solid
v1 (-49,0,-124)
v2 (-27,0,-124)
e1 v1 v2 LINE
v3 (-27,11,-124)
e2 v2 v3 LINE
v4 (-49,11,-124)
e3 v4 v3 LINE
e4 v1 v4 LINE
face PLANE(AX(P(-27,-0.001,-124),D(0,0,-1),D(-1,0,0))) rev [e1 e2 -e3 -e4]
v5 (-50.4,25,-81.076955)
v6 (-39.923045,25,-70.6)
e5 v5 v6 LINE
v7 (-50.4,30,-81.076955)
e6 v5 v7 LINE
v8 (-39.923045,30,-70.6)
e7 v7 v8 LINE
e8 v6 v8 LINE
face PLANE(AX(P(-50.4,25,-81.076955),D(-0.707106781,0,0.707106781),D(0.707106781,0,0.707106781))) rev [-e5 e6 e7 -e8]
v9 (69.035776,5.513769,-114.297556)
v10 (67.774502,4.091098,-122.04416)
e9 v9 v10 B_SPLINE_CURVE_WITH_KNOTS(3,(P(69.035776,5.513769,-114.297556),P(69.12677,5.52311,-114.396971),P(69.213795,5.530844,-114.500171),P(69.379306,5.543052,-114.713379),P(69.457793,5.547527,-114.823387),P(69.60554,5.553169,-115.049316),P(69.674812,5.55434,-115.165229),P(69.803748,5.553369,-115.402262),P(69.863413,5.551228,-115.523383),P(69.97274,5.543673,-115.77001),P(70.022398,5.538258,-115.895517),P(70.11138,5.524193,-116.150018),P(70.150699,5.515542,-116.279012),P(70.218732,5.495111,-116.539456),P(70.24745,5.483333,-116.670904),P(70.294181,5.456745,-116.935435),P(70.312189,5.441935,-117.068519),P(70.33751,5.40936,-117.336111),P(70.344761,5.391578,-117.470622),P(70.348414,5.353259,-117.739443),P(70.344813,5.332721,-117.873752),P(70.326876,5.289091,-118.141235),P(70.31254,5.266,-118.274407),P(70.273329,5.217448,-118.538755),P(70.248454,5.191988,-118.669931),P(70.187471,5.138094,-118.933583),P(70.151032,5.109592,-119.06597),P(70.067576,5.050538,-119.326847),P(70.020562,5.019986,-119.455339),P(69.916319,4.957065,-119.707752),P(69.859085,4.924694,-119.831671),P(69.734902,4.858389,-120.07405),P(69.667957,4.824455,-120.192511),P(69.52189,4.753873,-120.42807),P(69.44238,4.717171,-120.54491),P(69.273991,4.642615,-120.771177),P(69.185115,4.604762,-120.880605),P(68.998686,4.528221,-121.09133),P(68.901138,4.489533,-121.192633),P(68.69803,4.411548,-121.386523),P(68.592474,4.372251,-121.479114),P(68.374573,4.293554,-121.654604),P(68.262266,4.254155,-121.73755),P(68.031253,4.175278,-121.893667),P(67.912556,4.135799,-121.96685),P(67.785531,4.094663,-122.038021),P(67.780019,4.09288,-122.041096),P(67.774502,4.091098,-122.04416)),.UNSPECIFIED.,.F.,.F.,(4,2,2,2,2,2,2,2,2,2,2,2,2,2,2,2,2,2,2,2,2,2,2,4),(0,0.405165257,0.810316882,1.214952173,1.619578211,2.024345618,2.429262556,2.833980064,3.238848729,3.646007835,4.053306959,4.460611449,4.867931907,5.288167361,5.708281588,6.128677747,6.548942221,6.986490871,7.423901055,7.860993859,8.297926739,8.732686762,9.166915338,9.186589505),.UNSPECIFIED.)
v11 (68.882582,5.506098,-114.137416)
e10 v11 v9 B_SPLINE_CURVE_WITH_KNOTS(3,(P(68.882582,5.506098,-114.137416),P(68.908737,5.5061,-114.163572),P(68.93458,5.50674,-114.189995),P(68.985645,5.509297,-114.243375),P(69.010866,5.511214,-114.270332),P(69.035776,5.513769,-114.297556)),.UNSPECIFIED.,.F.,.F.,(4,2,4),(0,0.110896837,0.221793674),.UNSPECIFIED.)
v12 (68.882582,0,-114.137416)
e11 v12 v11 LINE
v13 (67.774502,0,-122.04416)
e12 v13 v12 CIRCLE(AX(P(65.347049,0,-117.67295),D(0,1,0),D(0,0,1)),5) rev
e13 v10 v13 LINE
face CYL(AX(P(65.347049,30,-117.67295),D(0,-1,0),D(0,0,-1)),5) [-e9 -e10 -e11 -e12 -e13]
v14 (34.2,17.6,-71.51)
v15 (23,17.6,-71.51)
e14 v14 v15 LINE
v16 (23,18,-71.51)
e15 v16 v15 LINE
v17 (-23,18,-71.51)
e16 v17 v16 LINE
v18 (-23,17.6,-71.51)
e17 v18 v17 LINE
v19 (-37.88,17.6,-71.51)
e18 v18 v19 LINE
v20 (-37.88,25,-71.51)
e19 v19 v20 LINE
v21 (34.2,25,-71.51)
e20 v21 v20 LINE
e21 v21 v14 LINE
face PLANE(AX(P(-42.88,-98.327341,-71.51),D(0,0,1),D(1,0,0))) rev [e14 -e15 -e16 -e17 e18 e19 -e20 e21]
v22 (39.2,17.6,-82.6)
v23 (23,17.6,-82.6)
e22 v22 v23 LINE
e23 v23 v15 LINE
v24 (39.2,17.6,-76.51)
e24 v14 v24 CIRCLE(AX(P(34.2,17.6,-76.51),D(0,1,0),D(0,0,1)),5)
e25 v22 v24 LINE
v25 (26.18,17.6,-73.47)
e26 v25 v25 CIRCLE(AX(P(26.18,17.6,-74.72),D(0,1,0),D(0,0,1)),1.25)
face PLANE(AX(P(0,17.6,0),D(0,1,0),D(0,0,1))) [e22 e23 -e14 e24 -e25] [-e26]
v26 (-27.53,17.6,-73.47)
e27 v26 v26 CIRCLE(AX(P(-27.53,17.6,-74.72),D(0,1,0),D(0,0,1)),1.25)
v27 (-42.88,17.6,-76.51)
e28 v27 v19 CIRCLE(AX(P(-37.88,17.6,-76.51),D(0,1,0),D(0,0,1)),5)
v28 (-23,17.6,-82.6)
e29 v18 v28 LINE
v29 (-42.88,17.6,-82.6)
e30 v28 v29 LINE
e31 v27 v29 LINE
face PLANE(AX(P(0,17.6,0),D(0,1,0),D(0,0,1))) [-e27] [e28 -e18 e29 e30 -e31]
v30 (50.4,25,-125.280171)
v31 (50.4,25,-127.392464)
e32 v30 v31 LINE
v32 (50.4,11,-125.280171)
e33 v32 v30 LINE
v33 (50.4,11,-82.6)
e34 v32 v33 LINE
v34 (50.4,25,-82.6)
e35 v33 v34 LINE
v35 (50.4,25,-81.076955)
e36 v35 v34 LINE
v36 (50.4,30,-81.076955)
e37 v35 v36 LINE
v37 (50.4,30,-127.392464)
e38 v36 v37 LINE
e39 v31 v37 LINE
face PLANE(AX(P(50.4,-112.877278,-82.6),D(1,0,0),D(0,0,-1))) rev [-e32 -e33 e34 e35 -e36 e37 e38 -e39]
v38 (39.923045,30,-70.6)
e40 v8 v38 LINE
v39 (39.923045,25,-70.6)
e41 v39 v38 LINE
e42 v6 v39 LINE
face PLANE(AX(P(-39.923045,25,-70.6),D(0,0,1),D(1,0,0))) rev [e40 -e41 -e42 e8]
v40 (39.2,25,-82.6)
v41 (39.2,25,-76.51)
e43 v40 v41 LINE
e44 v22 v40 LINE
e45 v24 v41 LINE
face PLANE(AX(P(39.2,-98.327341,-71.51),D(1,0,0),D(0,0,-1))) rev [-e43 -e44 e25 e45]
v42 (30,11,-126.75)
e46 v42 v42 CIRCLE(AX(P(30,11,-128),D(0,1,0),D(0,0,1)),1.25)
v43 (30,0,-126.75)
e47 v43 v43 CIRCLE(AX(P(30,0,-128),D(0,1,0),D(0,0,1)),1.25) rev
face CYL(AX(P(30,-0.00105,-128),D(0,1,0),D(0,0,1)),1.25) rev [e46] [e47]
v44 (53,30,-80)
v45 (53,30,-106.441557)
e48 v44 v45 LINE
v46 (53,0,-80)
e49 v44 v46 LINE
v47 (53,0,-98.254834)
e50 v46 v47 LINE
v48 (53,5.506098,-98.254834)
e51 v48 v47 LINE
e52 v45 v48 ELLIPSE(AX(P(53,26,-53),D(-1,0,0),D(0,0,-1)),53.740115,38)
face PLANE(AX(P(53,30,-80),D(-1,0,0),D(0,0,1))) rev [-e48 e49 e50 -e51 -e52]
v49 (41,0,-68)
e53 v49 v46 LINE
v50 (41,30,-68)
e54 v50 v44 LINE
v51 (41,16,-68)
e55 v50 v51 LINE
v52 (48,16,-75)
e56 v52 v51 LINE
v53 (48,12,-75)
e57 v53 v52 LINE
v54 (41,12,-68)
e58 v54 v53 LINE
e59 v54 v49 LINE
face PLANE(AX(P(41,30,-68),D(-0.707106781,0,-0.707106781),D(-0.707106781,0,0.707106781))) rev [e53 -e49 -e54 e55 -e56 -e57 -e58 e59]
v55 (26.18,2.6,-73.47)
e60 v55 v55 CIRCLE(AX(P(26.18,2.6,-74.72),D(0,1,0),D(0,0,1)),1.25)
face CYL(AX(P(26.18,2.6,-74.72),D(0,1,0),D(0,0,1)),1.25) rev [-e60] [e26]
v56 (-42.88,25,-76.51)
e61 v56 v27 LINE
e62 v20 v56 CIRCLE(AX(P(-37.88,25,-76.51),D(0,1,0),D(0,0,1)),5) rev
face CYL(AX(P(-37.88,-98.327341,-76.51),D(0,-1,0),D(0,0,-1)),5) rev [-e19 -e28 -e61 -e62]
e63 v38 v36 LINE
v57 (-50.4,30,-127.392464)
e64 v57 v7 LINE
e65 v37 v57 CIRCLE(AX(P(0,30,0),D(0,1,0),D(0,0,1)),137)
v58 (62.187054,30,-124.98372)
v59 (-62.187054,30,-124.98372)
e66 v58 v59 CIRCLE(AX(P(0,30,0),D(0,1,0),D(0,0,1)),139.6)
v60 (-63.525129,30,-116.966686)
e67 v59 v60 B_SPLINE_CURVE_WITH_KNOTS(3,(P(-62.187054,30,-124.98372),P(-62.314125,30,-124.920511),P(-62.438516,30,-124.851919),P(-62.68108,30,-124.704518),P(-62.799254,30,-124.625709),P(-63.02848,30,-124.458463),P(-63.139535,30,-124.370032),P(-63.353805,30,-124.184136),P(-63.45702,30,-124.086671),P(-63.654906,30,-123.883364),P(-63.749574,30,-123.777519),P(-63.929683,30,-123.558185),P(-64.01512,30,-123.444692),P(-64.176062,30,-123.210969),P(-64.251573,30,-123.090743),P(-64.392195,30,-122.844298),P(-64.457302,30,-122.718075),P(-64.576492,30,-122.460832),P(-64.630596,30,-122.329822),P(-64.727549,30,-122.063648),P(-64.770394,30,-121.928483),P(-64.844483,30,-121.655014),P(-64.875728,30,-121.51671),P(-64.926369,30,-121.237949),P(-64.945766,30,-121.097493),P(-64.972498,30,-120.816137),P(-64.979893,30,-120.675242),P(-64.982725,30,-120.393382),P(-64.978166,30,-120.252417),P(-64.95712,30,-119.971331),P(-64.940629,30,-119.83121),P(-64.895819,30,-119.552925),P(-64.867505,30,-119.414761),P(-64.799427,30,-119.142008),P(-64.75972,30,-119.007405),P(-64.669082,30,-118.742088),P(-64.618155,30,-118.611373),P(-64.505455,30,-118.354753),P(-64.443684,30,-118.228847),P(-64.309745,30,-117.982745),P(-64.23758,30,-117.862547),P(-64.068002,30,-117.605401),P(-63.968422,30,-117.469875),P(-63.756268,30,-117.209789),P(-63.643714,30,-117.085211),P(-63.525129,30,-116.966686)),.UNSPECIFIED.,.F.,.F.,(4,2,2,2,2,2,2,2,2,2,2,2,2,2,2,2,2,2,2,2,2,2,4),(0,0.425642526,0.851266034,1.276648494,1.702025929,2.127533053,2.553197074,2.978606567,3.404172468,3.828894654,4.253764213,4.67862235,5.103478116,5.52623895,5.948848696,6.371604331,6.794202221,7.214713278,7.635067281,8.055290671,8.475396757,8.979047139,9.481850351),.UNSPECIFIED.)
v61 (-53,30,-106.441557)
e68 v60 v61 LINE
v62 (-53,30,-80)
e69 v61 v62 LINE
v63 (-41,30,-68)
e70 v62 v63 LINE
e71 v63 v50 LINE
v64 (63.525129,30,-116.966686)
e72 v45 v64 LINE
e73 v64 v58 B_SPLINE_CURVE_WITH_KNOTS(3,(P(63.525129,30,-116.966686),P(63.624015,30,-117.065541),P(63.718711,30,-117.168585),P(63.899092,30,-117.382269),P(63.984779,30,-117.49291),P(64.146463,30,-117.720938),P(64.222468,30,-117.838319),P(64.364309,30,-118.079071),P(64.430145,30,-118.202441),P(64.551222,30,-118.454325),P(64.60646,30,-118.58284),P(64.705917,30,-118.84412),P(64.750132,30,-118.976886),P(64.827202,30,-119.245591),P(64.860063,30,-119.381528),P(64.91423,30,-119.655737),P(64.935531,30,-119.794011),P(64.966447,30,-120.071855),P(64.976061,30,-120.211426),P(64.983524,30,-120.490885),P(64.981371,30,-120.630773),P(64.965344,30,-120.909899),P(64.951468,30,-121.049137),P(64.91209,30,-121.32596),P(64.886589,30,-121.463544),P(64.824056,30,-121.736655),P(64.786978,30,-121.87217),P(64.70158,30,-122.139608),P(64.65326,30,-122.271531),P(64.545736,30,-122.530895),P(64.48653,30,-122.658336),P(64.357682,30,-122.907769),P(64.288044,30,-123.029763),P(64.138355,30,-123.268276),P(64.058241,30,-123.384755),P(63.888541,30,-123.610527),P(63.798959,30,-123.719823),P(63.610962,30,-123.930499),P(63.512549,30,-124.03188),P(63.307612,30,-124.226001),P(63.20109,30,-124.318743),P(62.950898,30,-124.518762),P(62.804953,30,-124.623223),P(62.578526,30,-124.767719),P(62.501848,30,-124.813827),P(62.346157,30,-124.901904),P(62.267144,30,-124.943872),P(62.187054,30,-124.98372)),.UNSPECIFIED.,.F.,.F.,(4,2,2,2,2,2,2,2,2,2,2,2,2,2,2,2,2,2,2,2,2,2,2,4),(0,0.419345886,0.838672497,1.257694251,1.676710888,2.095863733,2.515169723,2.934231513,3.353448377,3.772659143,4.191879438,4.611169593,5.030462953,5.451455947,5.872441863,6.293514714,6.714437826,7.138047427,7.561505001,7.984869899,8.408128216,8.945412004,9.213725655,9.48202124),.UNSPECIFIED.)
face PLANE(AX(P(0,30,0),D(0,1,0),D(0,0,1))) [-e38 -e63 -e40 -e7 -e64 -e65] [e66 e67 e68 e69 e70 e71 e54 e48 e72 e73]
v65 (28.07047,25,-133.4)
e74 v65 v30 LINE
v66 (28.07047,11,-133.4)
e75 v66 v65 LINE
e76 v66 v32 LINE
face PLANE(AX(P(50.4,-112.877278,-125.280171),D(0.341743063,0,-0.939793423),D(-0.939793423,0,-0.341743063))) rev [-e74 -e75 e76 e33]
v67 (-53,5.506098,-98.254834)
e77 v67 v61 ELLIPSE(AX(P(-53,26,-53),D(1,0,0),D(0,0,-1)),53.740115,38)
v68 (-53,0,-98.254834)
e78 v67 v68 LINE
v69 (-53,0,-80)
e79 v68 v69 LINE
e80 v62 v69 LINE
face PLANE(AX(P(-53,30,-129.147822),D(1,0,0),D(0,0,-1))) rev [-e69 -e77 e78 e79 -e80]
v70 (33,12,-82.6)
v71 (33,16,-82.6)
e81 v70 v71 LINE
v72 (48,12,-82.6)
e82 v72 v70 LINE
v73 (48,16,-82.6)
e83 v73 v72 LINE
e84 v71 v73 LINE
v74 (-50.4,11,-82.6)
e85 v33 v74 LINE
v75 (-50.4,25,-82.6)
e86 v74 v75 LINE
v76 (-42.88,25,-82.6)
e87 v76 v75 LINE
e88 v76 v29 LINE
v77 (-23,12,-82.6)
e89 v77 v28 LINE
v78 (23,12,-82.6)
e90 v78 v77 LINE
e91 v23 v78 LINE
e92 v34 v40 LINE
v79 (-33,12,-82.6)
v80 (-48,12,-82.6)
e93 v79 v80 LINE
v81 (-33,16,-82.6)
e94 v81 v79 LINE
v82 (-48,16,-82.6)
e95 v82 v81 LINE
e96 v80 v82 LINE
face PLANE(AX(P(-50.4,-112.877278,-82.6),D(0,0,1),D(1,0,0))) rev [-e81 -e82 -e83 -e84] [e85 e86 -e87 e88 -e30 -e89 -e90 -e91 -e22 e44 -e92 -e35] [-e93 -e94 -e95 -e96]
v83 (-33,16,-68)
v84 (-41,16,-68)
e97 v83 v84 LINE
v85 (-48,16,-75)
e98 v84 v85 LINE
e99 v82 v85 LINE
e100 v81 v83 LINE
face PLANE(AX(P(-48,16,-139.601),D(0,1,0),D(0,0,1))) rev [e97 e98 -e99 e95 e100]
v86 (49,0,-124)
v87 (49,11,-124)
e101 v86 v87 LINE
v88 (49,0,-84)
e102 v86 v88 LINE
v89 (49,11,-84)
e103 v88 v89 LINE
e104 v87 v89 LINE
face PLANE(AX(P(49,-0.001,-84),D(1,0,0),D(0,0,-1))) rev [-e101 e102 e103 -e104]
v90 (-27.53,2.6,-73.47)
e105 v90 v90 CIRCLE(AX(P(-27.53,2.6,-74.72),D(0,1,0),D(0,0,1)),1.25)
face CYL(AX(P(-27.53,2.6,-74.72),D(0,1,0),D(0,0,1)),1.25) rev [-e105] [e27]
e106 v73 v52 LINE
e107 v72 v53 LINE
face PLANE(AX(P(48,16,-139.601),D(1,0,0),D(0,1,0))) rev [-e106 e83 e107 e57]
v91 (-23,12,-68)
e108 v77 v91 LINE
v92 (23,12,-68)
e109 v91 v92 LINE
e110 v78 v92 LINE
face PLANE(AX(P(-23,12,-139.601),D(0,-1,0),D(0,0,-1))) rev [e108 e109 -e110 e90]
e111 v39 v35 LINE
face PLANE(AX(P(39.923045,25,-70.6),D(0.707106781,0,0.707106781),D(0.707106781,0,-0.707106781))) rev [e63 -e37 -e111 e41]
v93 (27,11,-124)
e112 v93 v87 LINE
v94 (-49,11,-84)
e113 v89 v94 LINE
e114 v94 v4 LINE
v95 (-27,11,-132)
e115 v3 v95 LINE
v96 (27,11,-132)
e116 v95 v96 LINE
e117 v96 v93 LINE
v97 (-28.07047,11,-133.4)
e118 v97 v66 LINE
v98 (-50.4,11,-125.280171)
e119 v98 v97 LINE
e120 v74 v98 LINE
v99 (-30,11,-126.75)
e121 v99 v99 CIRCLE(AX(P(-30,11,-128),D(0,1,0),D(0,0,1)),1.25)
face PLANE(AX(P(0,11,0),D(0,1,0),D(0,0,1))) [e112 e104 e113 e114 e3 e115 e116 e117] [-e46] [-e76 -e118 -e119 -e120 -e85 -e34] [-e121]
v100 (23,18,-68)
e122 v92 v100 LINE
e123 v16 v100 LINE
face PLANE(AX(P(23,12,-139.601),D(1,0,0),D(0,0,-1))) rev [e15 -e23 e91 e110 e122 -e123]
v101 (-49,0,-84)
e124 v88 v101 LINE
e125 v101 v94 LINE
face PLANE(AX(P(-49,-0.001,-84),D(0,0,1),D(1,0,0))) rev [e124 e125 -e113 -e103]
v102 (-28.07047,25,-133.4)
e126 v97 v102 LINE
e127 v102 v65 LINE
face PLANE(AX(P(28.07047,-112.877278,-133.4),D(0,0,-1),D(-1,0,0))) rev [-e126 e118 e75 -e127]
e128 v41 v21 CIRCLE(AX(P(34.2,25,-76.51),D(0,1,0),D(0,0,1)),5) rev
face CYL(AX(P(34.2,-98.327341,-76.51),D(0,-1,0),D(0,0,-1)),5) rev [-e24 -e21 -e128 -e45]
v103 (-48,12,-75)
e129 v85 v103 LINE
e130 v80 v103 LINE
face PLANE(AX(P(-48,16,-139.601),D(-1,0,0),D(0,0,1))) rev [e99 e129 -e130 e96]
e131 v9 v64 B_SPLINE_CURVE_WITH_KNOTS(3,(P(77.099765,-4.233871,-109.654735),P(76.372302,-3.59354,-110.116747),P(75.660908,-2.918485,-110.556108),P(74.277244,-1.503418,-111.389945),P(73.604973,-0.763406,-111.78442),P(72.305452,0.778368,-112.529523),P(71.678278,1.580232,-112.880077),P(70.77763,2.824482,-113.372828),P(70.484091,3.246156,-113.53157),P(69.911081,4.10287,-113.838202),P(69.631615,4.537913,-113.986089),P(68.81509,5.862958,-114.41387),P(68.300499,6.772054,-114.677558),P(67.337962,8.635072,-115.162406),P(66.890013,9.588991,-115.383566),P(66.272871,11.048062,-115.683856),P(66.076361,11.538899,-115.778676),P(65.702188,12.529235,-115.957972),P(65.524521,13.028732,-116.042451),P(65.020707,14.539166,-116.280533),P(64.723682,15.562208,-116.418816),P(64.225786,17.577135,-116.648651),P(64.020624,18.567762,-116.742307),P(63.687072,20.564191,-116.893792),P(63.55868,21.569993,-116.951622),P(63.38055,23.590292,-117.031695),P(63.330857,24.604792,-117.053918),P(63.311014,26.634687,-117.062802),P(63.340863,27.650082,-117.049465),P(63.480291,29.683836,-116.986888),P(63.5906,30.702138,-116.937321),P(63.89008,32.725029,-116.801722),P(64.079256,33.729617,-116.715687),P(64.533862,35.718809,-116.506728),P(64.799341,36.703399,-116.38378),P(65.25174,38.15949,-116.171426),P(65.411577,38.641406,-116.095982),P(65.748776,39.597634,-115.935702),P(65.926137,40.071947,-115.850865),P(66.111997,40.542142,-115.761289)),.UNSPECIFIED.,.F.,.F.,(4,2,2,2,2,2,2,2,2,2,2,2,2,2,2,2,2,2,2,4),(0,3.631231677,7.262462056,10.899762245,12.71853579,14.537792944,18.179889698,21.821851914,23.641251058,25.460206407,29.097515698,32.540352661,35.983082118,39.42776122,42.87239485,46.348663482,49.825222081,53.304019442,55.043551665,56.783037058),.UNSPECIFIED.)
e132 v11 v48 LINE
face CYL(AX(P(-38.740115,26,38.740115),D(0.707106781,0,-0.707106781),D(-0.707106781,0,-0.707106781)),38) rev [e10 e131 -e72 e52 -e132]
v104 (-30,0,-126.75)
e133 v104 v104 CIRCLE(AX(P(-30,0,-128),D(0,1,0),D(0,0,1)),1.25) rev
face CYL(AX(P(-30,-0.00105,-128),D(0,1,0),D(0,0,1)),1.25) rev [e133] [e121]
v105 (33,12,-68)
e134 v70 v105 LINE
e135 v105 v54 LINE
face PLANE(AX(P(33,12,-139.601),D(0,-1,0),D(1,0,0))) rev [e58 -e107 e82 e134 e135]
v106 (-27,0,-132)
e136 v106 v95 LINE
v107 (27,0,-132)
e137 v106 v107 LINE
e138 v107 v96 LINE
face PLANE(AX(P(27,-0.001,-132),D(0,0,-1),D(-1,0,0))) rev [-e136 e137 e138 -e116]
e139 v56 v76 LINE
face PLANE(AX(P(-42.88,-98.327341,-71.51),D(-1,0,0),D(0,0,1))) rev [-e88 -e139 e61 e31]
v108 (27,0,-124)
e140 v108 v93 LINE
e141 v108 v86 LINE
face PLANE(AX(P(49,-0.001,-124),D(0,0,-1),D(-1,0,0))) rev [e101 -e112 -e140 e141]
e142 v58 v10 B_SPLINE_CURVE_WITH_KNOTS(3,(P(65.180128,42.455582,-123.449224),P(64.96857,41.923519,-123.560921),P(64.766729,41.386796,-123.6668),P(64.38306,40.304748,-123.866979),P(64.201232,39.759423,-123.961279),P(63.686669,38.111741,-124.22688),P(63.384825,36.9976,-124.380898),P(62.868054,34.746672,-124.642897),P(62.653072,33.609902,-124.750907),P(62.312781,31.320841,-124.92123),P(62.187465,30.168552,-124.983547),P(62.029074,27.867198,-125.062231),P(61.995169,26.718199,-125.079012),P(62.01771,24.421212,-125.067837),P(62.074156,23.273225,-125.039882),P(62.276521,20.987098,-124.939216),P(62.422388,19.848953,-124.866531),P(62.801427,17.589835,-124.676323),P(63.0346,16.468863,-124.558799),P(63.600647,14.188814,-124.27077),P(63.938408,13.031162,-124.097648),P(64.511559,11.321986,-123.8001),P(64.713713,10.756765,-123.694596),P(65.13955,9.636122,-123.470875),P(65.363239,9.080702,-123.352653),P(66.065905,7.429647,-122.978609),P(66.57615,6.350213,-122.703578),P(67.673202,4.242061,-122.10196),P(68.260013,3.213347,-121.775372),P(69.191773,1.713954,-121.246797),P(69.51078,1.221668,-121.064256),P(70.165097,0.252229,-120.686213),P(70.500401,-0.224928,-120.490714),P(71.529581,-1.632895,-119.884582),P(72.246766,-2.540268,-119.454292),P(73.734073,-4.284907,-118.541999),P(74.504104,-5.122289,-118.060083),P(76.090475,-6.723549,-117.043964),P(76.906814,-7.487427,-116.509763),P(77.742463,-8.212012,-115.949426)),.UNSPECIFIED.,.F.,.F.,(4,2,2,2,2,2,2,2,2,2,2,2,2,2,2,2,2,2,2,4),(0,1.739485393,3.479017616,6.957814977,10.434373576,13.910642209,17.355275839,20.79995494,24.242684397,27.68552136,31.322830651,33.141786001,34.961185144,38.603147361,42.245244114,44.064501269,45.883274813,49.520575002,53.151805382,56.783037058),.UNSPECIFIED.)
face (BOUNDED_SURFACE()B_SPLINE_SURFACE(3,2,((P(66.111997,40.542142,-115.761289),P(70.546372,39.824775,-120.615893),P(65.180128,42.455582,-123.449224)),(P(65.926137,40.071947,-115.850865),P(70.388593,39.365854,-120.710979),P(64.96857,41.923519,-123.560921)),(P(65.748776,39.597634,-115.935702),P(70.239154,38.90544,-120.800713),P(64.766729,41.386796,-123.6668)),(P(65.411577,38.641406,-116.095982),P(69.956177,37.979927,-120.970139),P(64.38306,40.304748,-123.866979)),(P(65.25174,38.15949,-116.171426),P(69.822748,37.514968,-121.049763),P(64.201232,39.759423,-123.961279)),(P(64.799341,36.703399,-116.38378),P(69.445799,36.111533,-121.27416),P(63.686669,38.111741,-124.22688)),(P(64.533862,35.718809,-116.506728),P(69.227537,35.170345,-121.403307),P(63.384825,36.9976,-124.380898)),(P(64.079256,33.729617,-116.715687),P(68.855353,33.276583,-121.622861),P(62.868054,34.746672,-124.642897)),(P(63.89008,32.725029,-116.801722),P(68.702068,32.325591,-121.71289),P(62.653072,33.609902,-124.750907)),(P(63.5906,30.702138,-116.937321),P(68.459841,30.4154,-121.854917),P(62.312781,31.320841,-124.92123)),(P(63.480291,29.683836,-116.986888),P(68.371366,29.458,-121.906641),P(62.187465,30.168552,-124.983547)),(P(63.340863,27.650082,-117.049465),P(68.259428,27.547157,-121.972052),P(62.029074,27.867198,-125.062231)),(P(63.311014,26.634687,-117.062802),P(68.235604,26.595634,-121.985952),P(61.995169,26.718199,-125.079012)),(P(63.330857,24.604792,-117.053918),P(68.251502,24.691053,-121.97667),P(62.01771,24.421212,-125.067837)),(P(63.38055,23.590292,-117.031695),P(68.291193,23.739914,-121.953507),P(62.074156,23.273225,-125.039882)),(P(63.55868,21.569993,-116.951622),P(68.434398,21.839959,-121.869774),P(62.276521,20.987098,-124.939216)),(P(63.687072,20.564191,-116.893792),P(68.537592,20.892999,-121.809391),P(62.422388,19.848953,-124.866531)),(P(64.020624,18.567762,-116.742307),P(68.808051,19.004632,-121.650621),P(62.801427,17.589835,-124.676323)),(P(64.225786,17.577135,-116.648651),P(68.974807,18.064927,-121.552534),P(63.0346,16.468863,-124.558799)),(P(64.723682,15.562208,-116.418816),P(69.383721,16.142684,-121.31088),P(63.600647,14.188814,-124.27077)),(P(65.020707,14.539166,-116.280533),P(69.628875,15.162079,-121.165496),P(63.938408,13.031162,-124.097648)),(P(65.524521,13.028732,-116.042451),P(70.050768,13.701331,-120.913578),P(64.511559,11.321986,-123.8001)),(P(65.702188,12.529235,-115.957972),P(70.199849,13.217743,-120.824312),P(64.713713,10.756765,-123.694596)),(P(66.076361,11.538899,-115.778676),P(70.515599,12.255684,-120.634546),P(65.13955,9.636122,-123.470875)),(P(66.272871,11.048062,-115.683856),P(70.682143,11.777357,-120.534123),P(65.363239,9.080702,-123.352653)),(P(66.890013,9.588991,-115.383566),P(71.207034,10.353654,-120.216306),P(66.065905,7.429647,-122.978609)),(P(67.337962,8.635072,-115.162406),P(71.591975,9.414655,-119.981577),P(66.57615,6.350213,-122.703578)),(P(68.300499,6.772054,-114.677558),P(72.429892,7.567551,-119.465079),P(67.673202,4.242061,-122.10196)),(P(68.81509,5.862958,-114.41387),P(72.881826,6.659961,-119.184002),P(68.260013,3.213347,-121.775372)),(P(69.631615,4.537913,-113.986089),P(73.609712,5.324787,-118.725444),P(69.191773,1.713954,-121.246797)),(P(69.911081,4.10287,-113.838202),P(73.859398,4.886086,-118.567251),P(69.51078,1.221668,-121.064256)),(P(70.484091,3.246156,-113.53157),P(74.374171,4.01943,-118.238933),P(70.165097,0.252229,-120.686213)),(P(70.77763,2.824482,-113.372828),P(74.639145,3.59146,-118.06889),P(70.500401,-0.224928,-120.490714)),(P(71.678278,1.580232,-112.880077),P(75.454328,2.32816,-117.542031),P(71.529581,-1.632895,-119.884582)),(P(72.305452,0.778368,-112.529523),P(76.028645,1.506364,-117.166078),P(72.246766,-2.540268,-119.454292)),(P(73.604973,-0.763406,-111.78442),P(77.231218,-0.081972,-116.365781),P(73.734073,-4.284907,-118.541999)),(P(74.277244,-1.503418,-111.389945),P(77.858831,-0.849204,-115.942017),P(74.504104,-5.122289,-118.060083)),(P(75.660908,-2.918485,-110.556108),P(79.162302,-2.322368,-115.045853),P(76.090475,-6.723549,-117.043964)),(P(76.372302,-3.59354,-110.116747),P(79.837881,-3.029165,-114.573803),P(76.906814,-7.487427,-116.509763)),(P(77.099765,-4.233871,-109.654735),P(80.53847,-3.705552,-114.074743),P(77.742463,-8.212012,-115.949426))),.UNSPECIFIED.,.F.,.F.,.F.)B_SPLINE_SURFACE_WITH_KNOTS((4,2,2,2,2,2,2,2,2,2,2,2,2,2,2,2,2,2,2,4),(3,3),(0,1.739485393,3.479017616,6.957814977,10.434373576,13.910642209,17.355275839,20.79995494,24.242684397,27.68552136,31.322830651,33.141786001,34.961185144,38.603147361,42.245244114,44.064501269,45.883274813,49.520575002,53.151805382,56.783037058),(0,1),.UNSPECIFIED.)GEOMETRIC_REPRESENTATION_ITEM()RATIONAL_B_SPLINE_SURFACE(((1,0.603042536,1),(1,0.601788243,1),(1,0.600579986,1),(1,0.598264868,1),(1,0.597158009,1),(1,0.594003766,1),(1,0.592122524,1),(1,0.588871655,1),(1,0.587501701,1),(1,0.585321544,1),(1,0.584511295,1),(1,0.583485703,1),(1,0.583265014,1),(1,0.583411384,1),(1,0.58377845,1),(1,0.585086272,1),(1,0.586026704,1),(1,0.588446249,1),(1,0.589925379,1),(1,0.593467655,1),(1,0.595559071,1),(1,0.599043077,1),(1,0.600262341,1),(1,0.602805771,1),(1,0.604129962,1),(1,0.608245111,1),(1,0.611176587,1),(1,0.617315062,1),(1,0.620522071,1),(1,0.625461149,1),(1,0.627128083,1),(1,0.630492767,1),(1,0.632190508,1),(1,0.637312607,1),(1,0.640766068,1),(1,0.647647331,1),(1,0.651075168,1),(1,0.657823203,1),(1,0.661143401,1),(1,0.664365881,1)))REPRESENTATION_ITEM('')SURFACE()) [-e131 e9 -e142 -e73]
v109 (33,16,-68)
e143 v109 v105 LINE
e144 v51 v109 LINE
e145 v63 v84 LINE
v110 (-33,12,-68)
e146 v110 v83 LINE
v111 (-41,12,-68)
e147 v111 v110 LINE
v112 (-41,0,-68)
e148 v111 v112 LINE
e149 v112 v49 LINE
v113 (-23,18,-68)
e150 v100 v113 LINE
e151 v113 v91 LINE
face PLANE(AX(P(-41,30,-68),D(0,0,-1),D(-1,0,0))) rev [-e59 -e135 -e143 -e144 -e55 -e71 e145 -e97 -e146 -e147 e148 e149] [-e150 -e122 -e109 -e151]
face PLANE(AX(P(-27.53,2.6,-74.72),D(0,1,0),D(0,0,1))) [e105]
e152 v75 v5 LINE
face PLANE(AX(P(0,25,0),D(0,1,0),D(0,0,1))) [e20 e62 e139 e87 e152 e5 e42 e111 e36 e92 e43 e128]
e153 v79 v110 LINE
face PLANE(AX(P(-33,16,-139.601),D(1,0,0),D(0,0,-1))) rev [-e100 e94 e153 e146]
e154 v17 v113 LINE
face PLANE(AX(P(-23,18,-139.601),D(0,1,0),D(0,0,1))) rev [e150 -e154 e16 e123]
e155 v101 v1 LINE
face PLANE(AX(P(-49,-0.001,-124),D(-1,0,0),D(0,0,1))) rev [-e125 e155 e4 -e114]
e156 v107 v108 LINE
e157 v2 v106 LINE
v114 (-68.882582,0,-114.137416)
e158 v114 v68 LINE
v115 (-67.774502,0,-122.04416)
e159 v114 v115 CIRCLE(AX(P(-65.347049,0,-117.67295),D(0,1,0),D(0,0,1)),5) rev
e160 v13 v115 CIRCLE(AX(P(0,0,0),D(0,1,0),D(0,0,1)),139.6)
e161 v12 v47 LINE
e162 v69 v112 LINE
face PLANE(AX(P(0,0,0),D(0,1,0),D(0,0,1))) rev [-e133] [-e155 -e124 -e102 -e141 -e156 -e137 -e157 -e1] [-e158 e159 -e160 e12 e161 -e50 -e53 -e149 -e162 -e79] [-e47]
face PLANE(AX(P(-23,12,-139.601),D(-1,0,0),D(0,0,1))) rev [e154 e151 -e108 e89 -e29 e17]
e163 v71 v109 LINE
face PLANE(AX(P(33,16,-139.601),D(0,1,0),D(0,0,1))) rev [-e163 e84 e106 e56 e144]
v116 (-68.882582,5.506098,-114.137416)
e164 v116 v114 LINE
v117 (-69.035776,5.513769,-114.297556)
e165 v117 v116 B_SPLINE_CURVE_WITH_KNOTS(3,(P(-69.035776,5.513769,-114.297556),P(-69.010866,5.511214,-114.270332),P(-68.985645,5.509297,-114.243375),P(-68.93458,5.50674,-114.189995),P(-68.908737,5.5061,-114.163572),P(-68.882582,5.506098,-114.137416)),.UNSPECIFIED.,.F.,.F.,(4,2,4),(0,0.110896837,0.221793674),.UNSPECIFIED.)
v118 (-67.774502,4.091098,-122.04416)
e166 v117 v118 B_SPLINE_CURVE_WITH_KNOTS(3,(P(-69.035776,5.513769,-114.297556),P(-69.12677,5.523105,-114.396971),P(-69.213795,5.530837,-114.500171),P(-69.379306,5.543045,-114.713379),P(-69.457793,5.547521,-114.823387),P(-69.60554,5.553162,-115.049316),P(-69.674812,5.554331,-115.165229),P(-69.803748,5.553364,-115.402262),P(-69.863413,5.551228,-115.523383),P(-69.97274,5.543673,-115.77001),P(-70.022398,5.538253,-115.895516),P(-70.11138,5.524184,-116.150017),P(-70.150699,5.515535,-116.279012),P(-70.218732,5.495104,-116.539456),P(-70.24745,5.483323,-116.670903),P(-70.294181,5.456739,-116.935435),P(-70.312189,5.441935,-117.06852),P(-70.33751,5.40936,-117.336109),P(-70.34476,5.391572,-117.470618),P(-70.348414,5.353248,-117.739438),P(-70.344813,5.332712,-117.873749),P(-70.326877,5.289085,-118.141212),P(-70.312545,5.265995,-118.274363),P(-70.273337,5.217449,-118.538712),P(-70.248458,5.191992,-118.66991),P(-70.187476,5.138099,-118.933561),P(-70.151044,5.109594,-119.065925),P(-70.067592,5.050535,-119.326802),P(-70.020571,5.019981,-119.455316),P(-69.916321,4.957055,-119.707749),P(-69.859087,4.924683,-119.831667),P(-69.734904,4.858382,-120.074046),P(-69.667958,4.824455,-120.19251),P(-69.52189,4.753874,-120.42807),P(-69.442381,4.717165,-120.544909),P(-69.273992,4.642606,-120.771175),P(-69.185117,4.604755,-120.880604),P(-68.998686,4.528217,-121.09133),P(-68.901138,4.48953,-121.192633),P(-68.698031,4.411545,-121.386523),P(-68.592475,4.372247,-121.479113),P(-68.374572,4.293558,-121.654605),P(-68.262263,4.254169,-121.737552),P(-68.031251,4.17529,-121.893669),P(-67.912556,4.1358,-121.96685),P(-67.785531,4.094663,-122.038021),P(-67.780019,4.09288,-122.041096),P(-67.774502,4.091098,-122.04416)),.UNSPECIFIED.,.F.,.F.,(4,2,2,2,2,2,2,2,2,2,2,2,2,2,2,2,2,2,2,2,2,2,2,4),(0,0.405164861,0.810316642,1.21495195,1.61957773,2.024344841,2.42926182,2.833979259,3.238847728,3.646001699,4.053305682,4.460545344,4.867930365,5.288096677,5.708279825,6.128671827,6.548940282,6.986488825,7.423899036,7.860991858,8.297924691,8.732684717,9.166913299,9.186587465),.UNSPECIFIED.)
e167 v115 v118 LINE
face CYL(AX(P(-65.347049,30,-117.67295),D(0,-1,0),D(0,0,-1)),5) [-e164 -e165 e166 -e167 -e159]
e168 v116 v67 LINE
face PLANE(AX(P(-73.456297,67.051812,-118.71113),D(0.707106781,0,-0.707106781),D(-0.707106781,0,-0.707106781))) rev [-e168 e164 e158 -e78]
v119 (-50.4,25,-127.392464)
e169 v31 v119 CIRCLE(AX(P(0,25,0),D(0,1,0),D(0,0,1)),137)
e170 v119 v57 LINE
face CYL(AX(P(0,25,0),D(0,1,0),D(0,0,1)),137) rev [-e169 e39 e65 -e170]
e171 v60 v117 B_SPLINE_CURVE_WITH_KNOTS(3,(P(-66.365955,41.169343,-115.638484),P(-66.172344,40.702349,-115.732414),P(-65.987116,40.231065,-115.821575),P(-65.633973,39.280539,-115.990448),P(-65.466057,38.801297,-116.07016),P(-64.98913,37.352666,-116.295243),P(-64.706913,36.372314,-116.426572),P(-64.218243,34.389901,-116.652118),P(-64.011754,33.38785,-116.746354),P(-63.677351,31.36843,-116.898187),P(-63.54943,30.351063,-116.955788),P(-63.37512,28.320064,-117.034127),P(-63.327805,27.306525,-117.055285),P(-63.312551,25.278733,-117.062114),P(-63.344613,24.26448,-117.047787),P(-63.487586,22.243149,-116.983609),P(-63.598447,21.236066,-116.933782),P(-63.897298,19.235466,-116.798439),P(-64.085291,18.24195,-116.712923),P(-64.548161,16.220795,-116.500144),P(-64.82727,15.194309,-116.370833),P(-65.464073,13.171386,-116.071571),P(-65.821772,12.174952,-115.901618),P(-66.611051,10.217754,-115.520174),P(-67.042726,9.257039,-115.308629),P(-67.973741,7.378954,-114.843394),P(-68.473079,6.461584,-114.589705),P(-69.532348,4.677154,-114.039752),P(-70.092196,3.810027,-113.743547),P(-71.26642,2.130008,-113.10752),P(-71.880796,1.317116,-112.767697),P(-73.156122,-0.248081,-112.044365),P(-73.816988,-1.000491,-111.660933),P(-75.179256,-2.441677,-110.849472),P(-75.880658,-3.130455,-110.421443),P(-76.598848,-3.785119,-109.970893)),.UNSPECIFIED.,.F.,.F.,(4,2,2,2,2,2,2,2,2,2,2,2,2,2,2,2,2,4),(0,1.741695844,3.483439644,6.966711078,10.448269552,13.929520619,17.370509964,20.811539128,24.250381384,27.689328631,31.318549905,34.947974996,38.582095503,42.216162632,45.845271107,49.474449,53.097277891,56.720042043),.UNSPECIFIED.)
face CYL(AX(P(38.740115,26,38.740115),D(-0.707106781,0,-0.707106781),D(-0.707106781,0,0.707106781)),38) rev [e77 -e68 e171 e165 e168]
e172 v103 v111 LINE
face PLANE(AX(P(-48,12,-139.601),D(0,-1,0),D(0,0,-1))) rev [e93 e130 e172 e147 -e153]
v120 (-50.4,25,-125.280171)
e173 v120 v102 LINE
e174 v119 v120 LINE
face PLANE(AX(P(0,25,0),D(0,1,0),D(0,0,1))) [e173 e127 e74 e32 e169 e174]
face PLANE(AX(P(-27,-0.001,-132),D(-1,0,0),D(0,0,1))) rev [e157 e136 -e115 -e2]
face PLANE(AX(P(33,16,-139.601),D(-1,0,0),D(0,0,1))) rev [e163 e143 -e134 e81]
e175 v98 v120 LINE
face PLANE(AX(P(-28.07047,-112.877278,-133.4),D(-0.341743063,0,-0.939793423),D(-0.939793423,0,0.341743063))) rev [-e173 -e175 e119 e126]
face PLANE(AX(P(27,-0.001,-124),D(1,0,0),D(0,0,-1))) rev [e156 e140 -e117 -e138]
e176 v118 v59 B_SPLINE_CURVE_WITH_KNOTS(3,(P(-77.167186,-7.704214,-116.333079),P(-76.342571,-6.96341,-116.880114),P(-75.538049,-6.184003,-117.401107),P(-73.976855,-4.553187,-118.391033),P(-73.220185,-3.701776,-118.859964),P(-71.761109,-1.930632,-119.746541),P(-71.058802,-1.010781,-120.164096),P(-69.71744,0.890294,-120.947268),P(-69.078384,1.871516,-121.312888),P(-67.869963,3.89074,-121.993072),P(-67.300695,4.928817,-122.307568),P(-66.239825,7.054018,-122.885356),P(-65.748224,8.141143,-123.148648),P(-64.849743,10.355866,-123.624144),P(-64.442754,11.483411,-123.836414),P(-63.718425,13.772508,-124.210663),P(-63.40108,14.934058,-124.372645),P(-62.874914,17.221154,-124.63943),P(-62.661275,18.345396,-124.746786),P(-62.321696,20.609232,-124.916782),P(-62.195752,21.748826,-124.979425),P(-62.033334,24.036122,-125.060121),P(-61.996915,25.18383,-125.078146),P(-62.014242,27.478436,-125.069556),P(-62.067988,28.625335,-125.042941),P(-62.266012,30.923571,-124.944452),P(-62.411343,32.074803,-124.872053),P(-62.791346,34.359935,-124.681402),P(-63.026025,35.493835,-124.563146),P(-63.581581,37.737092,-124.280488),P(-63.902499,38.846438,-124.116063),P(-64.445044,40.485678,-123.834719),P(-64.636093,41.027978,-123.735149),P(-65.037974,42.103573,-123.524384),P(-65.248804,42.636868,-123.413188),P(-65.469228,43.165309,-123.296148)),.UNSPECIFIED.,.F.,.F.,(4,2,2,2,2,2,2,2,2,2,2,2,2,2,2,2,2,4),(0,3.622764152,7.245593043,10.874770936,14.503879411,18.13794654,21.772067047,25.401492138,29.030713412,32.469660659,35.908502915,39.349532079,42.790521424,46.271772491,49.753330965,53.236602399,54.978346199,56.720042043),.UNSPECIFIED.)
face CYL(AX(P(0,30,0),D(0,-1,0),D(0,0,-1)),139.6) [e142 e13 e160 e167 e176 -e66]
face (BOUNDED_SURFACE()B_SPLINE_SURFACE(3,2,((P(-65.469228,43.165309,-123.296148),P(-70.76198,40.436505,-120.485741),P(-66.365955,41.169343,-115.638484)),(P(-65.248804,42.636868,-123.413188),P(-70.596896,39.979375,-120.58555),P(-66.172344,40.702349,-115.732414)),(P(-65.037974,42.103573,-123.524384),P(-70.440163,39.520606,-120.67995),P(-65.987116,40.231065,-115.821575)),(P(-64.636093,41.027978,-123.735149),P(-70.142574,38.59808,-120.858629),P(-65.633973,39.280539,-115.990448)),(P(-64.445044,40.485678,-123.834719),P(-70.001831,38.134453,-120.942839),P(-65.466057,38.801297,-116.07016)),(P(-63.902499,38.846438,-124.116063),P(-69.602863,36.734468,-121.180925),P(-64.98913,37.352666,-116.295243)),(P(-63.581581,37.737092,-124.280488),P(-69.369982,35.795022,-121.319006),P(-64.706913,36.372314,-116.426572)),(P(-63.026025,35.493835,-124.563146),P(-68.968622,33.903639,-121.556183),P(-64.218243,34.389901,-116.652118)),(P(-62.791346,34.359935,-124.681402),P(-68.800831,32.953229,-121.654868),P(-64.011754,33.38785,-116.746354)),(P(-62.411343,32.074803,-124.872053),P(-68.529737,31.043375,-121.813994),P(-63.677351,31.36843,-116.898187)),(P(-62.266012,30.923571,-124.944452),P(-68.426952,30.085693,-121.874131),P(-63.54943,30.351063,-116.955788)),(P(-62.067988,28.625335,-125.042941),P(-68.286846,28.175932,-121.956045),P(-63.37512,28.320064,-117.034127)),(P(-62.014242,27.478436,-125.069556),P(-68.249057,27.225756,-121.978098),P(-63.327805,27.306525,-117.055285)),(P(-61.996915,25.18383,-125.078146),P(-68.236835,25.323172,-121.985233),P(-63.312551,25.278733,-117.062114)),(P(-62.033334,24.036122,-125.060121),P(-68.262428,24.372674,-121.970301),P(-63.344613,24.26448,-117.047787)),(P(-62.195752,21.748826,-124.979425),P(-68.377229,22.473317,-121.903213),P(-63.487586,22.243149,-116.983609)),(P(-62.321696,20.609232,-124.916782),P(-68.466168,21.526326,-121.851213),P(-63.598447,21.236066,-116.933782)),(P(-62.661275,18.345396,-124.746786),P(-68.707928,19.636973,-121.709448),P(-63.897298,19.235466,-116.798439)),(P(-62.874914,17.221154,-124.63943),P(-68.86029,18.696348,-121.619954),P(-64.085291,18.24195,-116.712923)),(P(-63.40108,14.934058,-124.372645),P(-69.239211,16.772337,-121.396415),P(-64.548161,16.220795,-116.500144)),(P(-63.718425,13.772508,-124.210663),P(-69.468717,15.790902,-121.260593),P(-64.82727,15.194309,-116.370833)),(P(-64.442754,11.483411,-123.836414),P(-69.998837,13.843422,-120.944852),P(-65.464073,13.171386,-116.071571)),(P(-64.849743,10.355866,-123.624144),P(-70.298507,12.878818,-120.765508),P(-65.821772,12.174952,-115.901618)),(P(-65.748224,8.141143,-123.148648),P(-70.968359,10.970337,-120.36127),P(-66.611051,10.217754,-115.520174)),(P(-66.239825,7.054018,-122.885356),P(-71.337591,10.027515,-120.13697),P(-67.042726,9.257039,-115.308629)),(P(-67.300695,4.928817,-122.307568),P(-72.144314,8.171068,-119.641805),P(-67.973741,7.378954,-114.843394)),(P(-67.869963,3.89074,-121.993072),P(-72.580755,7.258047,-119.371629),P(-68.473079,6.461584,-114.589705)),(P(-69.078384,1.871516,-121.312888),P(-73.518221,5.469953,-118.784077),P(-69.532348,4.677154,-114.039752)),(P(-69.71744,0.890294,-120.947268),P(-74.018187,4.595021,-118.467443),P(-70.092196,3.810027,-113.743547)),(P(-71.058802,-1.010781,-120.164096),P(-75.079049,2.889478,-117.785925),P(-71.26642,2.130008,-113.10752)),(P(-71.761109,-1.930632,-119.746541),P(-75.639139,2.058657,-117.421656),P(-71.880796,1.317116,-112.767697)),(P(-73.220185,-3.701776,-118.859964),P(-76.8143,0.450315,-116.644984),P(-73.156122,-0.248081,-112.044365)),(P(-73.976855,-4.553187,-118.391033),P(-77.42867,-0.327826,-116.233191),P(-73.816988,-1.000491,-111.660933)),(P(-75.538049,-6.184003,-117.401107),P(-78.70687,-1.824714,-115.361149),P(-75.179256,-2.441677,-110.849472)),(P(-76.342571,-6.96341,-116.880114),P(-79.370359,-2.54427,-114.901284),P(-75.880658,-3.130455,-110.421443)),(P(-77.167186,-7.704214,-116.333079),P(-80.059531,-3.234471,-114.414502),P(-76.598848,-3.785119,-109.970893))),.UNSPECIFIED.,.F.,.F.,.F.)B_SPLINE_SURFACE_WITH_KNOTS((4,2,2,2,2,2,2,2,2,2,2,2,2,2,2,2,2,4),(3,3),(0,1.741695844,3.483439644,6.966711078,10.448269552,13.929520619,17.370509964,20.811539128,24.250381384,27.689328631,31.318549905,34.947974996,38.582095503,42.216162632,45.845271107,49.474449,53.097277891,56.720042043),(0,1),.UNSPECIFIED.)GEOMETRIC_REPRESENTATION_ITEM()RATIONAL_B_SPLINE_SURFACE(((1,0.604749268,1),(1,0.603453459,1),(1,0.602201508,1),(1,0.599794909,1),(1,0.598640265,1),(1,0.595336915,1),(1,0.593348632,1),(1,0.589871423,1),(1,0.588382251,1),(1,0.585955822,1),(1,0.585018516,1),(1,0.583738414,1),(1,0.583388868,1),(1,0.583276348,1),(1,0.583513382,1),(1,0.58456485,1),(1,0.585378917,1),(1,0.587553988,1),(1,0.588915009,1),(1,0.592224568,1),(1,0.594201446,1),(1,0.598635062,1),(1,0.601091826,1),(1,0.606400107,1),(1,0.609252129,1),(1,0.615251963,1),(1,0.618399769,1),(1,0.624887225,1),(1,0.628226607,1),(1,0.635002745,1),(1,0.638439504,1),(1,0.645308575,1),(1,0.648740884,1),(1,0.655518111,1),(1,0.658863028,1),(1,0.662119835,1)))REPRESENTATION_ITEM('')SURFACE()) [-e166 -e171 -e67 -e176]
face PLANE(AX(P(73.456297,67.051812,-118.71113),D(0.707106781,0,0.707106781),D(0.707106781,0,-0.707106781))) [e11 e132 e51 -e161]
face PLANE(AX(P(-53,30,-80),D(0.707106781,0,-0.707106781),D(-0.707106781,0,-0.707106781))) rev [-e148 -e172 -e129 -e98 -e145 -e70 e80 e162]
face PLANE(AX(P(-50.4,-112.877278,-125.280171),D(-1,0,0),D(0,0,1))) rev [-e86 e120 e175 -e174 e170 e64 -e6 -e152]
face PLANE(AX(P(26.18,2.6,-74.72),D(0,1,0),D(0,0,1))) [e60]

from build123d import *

# Parameters (mm, degrees)
BOSS_EXTRUDE1_DEPTH = 30
CUT_EXTRUDE1_REACH  = 154.306
CUT_EXTRUDE2_DEPTH  = 19
SKETCH5_W           = 82.08
SKETCH5_H           = 54.14
CUT_EXTRUDE4_DEPTH  = 12.4
SKETCH4_R           = 1.25
CUT_EXTRUDE3_DEPTH  = 15
FILLET1_R           = 5
CUT_EXTRUDE5_DEPTH  = 5
BOSS_EXTRUDE2_DEPTH = 30
CUT_EXTRUDE6_REACH  = 160.176
SKETCH8_R           = 38
CUT_EXTRUDE7_REACH  = 179.588
SKETCH9_R           = 38
FILLET2_R           = 5
CUT_EXTRUDE8_REACH  = 106.763
SKETCH10_W          = 15
SKETCH10_H          = 4
SKETCH10_W_2        = 46
SKETCH10_H_2        = 6
CUT_EXTRUDE9_REACH  = 159.473
SKETCH11_R          = 1.25


with BuildPart() as part:
    # Sketch1 → Boss-Extrude1 (new body)
    with BuildSketch(Plane(origin=(0, 0, 0), x_dir=(1, 0, 0), z_dir=(0, 1, 0))):
        with BuildLine():
            Line((53, 80), (53, 129.147822281))
            ThreePointArc((53, 129.147822281), (0, 139.6), (-53, 129.147822281))
            Line((-53, 129.147822281), (-53, 80))
            Line((-53, 80), (-41, 68))
            Line((-41, 68), (41, 68))
            Line((41, 68), (53, 80))
        make_face()
    extrude(amount=BOSS_EXTRUDE1_DEPTH)

    # Sketch2 → Cut-Extrude1 (cut, up to next)
    with BuildSketch(Plane(origin=(0, 30, 0), x_dir=(1, 0, 0), z_dir=(0, 1, 0)), mode=Mode.PRIVATE) as cut_extrude1_sk1:
        Polygon((-49, 84), (49, 84), (49, 124), (27, 124), (27, 132), (-27, 132), (-27, 124), (-49, 124), align=None)
    cut_extrude1_tool1 = extrude(cut_extrude1_sk1.sketch, amount=-CUT_EXTRUDE1_REACH, mode=Mode.PRIVATE) & part.part
    add(cut_extrude1_tool1.solids().sort_by_distance((0, 30, -106.382353))[0], mode=Mode.SUBTRACT)

    # Sketch3 → Cut-Extrude2 (cut)
    with BuildSketch(Plane(origin=(0, 30, 0), x_dir=(1, 0, 0), z_dir=(0, 1, 0))):
        Polygon((-50.4, 125.280170906), (-50.4, 82.6), (50.4, 82.6), (50.4, 125.280170906), (28.070469991, 133.4), (-28.070469991, 133.4), align=None)
    extrude(amount=-CUT_EXTRUDE2_DEPTH, mode=Mode.SUBTRACT)

    # Sketch5 → Cut-Extrude4 (cut)
    with BuildSketch(Plane(origin=(0, 30, 0), x_dir=(1, 0, 0), z_dir=(0, 1, 0))):
        with Locations((-1.84, 98.58)):
            Rectangle(SKETCH5_W, SKETCH5_H)
    extrude(amount=-CUT_EXTRUDE4_DEPTH, mode=Mode.SUBTRACT)

    # Sketch4 → Cut-Extrude3 (cut)
    with BuildSketch(Plane(origin=(0, 17.6, 0), x_dir=(1, 0, 0), z_dir=(0, 1, 0))):
        with Locations(Location((26.18, 74.72, 0), (0, 0, 270))):
            Circle(SKETCH4_R)
        with Locations(Location((-27.53, 74.72, 0), (0, 0, 270))):
            Circle(SKETCH4_R)
    extrude(amount=-CUT_EXTRUDE3_DEPTH, mode=Mode.SUBTRACT)

    # Fillet1
    fillet1_edges = [part.edges().sort_by_distance(p)[0] for p in [
        (-42.88, 23.8, -71.51),
        (39.2, 23.8, -71.51),
    ]]
    fillet(fillet1_edges, radius=FILLET1_R)

    # Sketch6 → Cut-Extrude5 (cut)
    with BuildSketch(Plane(origin=(0, 30, 0), x_dir=(1, 0, 0), z_dir=(0, 1, 0))):
        with BuildLine():
            Line((50.4, 81.076955262), (50.4, 127.392464455))
            ThreePointArc((50.4, 127.392464455), (0, 137), (-50.4, 127.392464455))
            Line((-50.4, 127.392464455), (-50.4, 81.076955262))
            Line((-50.4, 81.076955262), (-39.923044738, 70.6))
            Line((-39.923044738, 70.6), (39.923044738, 70.6))
            Line((39.923044738, 70.6), (50.4, 81.076955262))
        make_face()
    extrude(amount=-CUT_EXTRUDE5_DEPTH, mode=Mode.SUBTRACT)

    # Sketch7 → Boss-Extrude2 (add)
    with BuildSketch(Plane.XZ):
        with BuildLine():
            Line((73.456296502, -118.711130498), (53, -98.254833996))
            Line((53, -98.254833996), (53, -129.147822281))
            ThreePointArc((53, -129.147822281), (63.443123072, -124.350834878), (73.456296502, -118.711130498))
        make_face()
    boss_extrude2 = extrude(amount=-BOSS_EXTRUDE2_DEPTH)

    # Cut-Extrude6: up to this plane
    cut_extrude6_end = Plane(origin=(53, 30, -80), z_dir=(-1, 0, 0))
    # Sketch8 → Cut-Extrude6 (cut, up to the surface)
    with BuildSketch(Plane(origin=(96.0837135, 0, -96.0837135), x_dir=(0, -1, 0), z_dir=(-0.7071067811865488, 0, 0.7071067811865464)), mode=Mode.PRIVATE) as cut_extrude6_sk1:
        with Locations((-26, 0)):
            Circle(SKETCH8_R)
    cut_extrude6_tool1 = split(extrude(cut_extrude6_sk1.sketch, amount=CUT_EXTRUDE6_REACH, mode=Mode.PRIVATE), bisect_by=cut_extrude6_end, keep=Keep.BOTH, mode=Mode.PRIVATE)
    add(cut_extrude6_tool1.solids().sort_by_distance((96.083714, 26, -96.083714))[0], mode=Mode.SUBTRACT)

    # Mirror1: Boss-Extrude2 across plane
    add(boss_extrude2.mirror(Plane(origin=(0, 0, 0), x_dir=(0, 0, 1), z_dir=(1, 0, 0))))

    # Cut-Extrude7: up to this plane
    cut_extrude7_end = Plane(origin=(-53, 30, -129.147822281), z_dir=(1, 0, 0))
    # Sketch9 → Cut-Extrude7 (cut, up to the surface)
    with BuildSketch(Plane(origin=(-96.0837135, 0, -96.0837135), x_dir=(0, -1, 0), z_dir=(0.7071067811865488, 0, 0.7071067811865464)), mode=Mode.PRIVATE) as cut_extrude7_sk1:
        with Locations((-26, 0)):
            Circle(SKETCH9_R)
    cut_extrude7_tool1 = split(extrude(cut_extrude7_sk1.sketch, amount=CUT_EXTRUDE7_REACH, mode=Mode.PRIVATE), bisect_by=cut_extrude7_end, keep=Keep.BOTH, mode=Mode.PRIVATE)
    add(cut_extrude7_tool1.solids().sort_by_distance((-96.083714, 26, -96.083714))[0], mode=Mode.SUBTRACT)

    # Fillet2
    fillet2_edges = [part.edges().sort_by_distance(p)[0] for p in [
        (68.992680179, 17.464833723, -121.359672387),
        (73.456296502, 2.753049234, -118.711130498),
        (-73.456296502, 2.753049234, -118.711130498),
        (-68.992679253, 17.464838179, -121.359672914),
    ]]
    fillet(fillet2_edges, radius=FILLET2_R - 0.0001)  # a hair under: the kernel refuses the full size

    # Sketch10 → Cut-Extrude8 (cut, up to next)
    with BuildSketch(Plane.XY.offset(-68), mode=Mode.PRIVATE) as cut_extrude8_sk1:
        with Locations((-40.5, 14)):
            Rectangle(SKETCH10_W, SKETCH10_H)
    cut_extrude8_tool1 = extrude(cut_extrude8_sk1.sketch, amount=-CUT_EXTRUDE8_REACH, mode=Mode.PRIVATE) & part.part
    # Sketch10 → Cut-Extrude8 (cut, up to next)
    with BuildSketch(Plane.XY.offset(-68), mode=Mode.PRIVATE) as cut_extrude8_sk2:
        with Locations((0, 15)):
            Rectangle(SKETCH10_W_2, SKETCH10_H_2)
    cut_extrude8_tool2 = extrude(cut_extrude8_sk2.sketch, amount=-CUT_EXTRUDE8_REACH, mode=Mode.PRIVATE) & part.part
    # Sketch10 → Cut-Extrude8 (cut, up to next)
    with BuildSketch(Plane.XY.offset(-68), mode=Mode.PRIVATE) as cut_extrude8_sk3:
        with Locations((40.5, 14)):
            Rectangle(SKETCH10_W, SKETCH10_H)
    cut_extrude8_tool3 = extrude(cut_extrude8_sk3.sketch, amount=-CUT_EXTRUDE8_REACH, mode=Mode.PRIVATE) & part.part
    add(cut_extrude8_tool1.solids().sort_by_distance((-40.5, 14, -68))[0], mode=Mode.SUBTRACT)
    add(cut_extrude8_tool2.solids().sort_by_distance((0, 15, -68))[0], mode=Mode.SUBTRACT)
    add(cut_extrude8_tool3.solids().sort_by_distance((40.5, 14, -68))[0], mode=Mode.SUBTRACT)

    # Sketch11 → Cut-Extrude9 (cut, up to next)
    with BuildSketch(Plane(origin=(0, 11, 0), x_dir=(1, 0, 0), z_dir=(0, 1, 0)), mode=Mode.PRIVATE) as cut_extrude9_sk1:
        with Locations(Location((-30, 128, 0), (0, 0, 270))):
            Circle(SKETCH11_R)
    cut_extrude9_tool1 = extrude(cut_extrude9_sk1.sketch, amount=-CUT_EXTRUDE9_REACH, mode=Mode.PRIVATE) & part.part
    # Sketch11 → Cut-Extrude9 (cut, up to next)
    with BuildSketch(Plane(origin=(0, 11, 0), x_dir=(1, 0, 0), z_dir=(0, 1, 0)), mode=Mode.PRIVATE) as cut_extrude9_sk2:
        with Locations(Location((30, 128, 0), (0, 0, 270))):
            Circle(SKETCH11_R)
    cut_extrude9_tool2 = extrude(cut_extrude9_sk2.sketch, amount=-CUT_EXTRUDE9_REACH, mode=Mode.PRIVATE) & part.part
    add(cut_extrude9_tool1.solids().sort_by_distance((-30, 11, -128))[0], mode=Mode.SUBTRACT)
    add(cut_extrude9_tool2.solids().sort_by_distance((30, 11, -128))[0], mode=Mode.SUBTRACT)


solid = part.part
